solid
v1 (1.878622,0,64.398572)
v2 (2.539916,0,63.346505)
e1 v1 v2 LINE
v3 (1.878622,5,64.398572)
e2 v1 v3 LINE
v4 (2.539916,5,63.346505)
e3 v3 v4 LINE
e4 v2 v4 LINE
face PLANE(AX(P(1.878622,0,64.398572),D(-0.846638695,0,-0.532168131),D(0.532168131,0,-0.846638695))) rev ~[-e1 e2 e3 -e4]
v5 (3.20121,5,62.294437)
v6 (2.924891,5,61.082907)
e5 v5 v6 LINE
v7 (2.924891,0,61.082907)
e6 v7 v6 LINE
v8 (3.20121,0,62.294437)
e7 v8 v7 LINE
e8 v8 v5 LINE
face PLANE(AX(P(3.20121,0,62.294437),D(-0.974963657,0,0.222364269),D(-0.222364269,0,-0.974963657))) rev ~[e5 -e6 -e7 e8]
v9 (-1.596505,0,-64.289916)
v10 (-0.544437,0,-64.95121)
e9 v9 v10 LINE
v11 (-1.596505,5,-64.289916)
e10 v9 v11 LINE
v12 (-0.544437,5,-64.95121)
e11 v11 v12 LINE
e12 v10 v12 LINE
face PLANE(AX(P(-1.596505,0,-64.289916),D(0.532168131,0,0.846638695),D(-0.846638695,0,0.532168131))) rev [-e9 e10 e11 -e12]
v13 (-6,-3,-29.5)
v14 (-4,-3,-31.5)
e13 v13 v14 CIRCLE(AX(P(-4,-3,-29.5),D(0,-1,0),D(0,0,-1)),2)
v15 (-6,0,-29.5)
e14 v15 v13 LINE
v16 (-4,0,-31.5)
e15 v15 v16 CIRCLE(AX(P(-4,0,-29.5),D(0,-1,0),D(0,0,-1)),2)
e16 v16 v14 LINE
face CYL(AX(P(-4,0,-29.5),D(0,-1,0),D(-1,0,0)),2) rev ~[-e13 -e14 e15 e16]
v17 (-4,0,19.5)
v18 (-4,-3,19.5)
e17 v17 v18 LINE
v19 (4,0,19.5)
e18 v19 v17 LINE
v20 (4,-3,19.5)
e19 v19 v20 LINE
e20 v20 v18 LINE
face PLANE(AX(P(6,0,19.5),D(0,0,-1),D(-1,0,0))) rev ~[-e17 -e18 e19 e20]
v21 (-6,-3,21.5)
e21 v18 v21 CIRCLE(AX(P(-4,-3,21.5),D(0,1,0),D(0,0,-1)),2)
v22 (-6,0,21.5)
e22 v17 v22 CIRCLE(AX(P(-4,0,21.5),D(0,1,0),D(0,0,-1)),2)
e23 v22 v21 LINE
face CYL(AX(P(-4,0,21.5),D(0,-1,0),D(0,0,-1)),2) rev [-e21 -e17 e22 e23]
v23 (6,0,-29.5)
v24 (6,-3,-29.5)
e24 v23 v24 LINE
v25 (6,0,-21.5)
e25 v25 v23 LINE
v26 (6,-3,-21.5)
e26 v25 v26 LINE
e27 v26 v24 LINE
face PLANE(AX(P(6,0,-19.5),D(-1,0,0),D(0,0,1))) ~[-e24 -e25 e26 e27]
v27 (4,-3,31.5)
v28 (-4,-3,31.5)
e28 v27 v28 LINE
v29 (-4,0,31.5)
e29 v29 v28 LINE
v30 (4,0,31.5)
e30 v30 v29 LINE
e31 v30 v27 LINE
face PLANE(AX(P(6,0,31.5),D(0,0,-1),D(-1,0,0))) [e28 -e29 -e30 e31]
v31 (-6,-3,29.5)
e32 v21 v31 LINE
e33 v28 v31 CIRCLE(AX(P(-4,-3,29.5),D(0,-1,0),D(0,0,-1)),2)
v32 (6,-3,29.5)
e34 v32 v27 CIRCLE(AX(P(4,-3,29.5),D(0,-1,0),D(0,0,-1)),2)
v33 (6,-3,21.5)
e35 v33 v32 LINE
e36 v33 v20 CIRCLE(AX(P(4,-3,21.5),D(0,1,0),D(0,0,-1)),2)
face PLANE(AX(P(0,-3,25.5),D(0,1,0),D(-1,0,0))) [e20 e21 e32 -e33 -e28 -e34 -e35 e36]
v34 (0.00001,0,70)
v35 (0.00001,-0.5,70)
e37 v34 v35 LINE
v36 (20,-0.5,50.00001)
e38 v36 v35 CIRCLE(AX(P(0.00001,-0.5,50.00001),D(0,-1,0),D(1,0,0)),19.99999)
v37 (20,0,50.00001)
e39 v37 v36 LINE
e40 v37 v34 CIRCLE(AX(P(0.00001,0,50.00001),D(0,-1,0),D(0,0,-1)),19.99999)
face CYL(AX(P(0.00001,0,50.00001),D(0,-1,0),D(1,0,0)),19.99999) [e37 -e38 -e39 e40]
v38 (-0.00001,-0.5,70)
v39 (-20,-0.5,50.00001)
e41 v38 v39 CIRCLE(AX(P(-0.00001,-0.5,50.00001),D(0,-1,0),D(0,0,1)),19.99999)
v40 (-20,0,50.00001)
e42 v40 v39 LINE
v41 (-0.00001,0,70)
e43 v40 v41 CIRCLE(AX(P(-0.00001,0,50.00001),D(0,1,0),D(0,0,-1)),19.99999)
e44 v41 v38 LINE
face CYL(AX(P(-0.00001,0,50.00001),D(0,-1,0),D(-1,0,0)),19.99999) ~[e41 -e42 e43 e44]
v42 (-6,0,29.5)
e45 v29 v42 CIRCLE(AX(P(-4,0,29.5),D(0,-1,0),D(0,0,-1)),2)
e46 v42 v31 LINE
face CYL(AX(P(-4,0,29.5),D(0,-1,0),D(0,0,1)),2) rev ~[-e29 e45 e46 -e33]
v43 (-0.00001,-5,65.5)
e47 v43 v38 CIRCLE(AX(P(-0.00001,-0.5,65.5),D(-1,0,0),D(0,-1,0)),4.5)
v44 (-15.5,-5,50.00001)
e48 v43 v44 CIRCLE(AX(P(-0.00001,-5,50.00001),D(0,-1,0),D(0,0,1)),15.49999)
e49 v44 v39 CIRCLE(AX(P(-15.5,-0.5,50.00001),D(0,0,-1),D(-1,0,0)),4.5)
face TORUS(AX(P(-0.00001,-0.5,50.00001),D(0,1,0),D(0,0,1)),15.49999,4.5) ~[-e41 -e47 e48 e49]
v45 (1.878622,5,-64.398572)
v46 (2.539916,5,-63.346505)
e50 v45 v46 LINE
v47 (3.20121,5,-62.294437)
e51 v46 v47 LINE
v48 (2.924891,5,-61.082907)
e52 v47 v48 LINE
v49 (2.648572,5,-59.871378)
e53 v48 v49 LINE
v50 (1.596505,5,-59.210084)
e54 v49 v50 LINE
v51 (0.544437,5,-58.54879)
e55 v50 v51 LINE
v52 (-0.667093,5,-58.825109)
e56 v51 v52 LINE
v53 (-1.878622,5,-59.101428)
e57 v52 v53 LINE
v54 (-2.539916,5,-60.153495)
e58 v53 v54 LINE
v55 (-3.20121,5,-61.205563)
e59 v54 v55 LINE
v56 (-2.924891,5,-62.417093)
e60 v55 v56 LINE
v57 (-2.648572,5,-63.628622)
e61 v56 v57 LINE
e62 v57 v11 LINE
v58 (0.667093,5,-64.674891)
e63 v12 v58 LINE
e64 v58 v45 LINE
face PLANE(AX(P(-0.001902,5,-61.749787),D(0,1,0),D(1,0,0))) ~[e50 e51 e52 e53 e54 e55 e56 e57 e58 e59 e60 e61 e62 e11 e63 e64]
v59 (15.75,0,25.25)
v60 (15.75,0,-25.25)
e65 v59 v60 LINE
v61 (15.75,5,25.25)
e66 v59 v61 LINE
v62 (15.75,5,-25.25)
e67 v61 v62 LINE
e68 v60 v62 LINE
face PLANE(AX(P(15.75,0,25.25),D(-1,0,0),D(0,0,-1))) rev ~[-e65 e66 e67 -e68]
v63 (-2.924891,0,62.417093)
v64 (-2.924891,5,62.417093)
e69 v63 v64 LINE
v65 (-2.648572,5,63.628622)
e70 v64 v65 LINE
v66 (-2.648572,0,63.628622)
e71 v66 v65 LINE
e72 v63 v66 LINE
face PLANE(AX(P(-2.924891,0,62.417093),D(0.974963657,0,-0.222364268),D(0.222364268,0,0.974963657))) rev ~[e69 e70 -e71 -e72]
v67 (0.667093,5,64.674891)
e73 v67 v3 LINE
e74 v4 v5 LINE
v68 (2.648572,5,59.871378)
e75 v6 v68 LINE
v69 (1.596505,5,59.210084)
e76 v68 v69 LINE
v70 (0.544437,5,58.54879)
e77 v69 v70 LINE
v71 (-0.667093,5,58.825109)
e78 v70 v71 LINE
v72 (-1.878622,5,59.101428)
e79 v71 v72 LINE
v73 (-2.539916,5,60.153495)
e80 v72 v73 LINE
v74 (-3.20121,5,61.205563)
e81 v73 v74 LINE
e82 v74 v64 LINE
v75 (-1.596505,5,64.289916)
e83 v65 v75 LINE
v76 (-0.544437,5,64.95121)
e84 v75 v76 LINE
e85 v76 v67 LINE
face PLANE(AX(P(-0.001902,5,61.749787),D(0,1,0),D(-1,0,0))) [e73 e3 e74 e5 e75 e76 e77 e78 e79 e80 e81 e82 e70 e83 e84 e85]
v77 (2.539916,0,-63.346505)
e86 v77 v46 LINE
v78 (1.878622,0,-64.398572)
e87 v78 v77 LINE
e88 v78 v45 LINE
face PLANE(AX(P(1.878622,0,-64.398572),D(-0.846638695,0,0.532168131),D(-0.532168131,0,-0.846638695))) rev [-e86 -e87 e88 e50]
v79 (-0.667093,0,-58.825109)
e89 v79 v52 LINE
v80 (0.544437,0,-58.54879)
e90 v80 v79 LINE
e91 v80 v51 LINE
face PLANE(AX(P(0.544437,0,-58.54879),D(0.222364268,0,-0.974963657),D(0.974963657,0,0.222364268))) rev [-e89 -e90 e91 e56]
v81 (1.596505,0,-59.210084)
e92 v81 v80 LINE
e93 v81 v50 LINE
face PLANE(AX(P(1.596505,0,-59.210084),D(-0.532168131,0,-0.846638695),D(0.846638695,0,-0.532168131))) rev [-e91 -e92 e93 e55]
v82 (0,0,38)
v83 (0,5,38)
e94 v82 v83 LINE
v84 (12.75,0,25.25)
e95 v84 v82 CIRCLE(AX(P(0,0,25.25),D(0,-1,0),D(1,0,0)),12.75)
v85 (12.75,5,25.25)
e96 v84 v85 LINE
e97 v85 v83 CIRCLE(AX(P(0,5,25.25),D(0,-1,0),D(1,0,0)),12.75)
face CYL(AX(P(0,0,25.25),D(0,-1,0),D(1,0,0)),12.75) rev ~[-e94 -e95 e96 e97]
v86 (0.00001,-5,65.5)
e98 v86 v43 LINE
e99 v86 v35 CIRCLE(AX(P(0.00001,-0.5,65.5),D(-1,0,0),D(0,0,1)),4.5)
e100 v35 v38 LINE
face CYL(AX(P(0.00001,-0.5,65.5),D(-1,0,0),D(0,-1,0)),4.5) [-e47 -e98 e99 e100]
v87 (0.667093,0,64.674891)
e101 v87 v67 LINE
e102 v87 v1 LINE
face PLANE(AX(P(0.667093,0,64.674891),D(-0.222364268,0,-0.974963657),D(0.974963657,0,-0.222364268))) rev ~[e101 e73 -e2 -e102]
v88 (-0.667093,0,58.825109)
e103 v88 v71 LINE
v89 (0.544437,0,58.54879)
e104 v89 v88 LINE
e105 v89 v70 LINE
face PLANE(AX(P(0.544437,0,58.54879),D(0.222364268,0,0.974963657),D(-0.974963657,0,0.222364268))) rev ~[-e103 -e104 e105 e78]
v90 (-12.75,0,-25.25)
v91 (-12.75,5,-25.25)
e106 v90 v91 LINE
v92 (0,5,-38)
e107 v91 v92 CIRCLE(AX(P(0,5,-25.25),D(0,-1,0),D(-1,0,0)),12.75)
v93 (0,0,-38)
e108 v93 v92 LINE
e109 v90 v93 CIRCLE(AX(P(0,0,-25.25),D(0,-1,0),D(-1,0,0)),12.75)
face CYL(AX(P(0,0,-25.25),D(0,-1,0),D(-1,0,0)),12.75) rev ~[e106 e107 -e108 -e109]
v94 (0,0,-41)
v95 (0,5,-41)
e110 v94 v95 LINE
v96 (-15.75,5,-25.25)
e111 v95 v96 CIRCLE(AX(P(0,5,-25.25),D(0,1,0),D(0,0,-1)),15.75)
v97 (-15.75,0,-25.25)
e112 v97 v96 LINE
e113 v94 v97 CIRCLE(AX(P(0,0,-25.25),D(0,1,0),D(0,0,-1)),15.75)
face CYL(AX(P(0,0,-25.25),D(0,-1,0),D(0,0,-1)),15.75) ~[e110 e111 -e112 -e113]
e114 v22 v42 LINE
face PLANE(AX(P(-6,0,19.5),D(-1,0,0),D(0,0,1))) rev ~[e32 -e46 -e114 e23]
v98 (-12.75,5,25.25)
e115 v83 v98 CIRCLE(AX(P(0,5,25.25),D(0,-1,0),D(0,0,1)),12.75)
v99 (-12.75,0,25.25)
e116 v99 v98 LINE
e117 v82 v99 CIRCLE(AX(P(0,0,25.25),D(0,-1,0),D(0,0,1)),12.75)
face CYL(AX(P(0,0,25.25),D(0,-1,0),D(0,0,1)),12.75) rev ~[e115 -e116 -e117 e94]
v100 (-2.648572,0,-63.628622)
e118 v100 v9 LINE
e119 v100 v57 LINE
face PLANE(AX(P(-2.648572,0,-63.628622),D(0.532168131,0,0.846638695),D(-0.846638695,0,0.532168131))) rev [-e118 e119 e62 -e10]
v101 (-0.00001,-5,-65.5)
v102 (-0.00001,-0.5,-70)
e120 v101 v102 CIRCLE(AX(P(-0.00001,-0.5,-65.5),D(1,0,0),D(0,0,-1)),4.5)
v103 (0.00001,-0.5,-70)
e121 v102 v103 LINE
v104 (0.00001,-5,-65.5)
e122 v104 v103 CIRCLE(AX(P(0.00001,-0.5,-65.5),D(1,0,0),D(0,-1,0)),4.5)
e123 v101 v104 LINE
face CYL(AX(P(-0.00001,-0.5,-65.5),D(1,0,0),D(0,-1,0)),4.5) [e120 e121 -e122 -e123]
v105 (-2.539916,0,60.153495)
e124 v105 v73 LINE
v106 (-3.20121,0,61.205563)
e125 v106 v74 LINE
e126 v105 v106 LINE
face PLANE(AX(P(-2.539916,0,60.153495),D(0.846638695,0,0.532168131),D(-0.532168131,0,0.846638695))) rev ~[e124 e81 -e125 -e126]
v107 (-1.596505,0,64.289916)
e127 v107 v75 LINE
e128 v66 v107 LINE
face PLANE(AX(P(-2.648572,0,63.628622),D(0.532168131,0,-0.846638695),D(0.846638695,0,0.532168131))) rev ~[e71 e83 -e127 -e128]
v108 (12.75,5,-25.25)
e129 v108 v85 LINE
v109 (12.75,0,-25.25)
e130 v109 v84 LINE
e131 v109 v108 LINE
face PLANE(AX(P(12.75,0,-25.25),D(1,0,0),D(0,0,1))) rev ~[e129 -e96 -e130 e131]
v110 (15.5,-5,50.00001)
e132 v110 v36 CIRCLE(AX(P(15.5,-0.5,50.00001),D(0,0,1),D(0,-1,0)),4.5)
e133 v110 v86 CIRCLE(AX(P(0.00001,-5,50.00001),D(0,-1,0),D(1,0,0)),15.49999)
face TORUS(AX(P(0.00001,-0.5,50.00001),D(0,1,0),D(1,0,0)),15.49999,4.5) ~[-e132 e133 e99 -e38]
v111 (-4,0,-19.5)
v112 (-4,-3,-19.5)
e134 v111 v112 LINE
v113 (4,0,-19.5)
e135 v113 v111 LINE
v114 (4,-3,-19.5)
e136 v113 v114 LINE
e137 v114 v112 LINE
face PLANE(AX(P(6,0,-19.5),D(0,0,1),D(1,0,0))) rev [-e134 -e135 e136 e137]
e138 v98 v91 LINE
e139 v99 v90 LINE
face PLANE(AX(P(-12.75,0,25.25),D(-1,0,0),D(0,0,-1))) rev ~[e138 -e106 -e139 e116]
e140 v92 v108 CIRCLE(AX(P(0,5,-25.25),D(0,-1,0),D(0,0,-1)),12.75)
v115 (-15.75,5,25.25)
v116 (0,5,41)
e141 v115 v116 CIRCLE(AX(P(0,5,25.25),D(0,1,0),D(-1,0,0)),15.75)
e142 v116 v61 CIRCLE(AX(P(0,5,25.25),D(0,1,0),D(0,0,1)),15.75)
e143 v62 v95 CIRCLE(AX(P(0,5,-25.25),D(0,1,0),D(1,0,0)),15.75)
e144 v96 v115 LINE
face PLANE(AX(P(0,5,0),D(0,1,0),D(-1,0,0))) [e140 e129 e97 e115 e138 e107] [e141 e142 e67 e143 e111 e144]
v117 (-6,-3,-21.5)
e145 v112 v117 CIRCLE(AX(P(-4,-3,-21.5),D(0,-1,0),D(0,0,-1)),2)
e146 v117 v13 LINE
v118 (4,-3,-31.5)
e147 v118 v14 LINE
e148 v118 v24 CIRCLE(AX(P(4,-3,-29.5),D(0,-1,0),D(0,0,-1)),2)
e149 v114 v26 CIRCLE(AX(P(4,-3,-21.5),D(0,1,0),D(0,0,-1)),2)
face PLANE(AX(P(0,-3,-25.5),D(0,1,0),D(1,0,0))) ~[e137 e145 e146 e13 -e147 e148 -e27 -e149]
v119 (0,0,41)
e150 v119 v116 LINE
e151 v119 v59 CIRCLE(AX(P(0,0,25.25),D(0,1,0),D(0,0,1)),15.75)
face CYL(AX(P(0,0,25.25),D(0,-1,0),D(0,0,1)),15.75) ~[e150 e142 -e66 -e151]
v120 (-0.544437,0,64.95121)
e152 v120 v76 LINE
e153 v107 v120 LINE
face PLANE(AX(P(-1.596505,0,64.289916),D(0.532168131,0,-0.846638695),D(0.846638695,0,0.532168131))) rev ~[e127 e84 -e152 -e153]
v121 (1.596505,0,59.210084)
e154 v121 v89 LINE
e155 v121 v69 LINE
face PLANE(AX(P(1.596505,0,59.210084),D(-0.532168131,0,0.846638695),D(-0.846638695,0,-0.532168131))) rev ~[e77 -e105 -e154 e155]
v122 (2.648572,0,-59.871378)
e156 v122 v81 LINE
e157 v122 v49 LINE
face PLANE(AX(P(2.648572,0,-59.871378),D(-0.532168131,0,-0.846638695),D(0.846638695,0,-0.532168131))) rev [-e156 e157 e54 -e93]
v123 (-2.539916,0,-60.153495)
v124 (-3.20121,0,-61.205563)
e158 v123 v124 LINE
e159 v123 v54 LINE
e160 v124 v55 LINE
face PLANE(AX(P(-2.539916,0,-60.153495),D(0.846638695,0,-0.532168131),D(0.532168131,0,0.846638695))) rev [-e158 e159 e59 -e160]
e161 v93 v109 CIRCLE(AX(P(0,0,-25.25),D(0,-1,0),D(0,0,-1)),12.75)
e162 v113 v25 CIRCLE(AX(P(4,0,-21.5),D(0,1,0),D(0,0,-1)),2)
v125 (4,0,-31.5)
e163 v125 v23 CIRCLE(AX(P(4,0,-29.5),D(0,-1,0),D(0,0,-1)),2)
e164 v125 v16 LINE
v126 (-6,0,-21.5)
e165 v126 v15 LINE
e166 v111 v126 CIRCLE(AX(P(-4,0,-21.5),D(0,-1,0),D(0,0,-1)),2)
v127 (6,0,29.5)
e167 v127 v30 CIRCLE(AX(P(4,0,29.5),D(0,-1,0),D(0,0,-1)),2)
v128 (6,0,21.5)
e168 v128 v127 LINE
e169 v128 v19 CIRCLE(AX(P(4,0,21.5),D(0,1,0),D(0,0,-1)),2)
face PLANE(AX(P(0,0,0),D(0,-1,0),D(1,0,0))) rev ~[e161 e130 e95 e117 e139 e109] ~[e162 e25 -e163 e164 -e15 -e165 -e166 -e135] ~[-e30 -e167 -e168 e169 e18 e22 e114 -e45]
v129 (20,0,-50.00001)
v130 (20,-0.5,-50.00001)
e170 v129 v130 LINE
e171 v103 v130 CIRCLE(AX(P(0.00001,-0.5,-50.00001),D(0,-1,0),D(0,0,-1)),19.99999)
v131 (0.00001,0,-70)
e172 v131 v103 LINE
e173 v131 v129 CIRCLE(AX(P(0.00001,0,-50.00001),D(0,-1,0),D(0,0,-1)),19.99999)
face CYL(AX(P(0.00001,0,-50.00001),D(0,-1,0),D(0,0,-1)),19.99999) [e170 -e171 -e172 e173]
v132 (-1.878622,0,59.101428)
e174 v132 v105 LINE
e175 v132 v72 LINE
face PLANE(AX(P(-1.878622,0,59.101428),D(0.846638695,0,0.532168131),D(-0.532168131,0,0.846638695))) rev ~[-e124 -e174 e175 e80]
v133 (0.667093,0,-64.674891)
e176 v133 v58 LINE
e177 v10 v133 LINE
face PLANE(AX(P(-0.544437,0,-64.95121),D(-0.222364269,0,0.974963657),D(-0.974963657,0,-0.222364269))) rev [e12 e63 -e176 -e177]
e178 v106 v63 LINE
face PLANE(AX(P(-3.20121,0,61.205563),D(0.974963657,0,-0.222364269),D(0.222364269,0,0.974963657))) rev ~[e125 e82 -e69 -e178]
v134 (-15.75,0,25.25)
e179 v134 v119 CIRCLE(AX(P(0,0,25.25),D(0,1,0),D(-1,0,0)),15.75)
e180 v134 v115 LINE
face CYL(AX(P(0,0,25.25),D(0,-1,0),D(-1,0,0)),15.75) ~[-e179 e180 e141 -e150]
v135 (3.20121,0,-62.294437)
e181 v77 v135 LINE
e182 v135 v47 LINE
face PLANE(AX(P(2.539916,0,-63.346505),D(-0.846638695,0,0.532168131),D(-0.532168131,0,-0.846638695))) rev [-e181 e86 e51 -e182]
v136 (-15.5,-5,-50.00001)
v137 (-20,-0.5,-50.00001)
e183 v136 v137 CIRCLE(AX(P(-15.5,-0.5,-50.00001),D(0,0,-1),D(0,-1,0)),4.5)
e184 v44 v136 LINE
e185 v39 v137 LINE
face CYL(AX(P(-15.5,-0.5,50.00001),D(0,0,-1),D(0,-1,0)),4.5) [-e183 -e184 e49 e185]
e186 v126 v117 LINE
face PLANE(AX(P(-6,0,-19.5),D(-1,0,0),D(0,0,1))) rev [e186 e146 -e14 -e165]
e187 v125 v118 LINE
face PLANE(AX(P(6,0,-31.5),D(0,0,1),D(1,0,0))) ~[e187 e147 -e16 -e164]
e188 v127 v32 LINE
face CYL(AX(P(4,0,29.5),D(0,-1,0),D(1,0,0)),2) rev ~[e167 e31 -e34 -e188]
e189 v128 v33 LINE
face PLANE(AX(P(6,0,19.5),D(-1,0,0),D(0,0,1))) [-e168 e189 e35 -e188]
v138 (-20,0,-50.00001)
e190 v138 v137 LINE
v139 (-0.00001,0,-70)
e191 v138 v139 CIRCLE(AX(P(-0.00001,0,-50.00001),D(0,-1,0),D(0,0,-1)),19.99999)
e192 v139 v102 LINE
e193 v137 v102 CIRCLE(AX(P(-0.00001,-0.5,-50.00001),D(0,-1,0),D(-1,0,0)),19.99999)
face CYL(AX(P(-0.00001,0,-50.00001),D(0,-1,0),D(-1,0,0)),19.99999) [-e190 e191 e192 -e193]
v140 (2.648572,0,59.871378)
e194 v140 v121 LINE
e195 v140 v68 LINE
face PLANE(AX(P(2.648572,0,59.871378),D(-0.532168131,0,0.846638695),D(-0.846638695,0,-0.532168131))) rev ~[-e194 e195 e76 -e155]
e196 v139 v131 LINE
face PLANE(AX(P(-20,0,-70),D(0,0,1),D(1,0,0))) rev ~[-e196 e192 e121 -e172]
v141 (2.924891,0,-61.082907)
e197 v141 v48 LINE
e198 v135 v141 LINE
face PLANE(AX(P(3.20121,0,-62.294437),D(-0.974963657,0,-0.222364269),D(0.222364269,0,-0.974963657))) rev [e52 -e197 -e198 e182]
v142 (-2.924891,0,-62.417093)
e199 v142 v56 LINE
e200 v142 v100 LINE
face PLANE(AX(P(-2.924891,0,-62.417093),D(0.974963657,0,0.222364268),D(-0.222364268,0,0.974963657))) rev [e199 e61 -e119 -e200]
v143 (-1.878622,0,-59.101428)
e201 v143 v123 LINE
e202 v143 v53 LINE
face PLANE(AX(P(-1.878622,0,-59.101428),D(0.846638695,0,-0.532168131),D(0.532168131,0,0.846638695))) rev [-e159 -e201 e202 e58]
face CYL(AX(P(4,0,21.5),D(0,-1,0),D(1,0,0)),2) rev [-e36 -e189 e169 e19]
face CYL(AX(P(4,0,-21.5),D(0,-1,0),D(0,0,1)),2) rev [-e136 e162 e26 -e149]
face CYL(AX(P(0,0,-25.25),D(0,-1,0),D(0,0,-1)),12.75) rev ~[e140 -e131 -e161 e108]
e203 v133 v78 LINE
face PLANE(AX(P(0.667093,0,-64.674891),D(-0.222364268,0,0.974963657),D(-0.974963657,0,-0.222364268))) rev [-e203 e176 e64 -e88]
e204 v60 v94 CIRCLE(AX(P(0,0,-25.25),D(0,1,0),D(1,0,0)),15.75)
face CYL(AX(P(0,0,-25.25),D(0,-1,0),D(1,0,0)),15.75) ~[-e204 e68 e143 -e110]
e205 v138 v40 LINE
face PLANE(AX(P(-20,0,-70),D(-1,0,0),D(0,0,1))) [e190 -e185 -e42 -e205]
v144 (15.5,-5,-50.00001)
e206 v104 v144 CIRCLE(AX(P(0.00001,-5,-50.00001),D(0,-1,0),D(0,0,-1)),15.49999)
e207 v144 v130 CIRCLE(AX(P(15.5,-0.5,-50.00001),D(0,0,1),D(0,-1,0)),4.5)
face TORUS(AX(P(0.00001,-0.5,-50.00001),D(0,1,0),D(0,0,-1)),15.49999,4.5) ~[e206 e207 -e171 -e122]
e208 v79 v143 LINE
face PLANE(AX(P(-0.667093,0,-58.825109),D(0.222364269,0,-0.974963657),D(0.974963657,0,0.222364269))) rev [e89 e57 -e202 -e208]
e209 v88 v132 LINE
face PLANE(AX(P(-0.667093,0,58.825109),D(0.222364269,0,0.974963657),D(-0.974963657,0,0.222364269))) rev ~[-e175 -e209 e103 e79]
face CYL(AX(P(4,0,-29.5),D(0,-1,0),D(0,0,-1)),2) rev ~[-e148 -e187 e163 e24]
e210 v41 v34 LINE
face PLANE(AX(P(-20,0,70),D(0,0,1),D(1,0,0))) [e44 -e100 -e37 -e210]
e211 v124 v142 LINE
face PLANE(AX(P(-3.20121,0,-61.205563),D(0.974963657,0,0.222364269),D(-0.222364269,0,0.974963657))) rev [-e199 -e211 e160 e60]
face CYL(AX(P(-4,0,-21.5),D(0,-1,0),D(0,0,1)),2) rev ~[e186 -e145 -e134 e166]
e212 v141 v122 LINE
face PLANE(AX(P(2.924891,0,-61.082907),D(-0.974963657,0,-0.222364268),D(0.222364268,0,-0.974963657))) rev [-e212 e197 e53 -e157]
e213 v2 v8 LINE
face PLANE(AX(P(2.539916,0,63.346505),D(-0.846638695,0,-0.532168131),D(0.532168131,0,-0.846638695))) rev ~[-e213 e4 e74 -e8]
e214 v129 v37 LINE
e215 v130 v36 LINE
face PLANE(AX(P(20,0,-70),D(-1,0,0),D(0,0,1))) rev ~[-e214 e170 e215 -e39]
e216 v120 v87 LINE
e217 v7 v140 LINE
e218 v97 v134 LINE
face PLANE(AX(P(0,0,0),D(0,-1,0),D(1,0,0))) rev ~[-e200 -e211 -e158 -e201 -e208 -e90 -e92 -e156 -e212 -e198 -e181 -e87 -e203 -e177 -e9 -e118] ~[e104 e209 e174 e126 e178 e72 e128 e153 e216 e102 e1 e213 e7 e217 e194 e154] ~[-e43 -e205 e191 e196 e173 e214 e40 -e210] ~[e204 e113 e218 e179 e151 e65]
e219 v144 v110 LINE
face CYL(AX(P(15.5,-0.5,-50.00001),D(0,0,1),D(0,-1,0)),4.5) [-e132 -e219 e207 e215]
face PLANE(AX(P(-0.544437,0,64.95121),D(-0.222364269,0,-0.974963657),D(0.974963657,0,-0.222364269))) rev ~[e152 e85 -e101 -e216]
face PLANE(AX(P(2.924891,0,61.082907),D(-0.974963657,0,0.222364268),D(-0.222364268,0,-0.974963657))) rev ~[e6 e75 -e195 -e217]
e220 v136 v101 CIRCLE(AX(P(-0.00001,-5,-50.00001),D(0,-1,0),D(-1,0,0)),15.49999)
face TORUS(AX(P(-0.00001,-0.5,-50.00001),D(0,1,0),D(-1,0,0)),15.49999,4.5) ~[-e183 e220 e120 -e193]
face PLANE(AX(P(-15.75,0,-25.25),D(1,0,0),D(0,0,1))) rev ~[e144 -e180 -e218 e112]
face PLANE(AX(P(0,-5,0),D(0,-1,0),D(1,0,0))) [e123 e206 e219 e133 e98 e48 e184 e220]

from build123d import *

# Parameters (mm, degrees)
F0_W      = 40
F0_H      = 140
F1_DEPTH  = 5
F2_R      = 19.99999
F3_R      = 4.5
F5_DEPTH  = 5
F6_W      = 12
F6_H      = 12
F7_DEPTH  = 3
F8_R      = 2
F10_DEPTH = 5


# Not quite as in the source:
# - a fillet or chamfer is up to 0.001 mm smaller than in the source, because OpenCascade refuses the exact size
# - a pattern or mirror of a feature is missing from the dataset's text; its kind, count and spacing are read off the source's solid


with BuildPart() as f1:
    # F0 (on Front) → F1 (new body)
    with BuildSketch(Plane.XZ):
        Rectangle(F0_W, F0_H)
    extrude(amount=F1_DEPTH)

    # F2 (radius 20 in the source; OpenCascade refuses exactly that, so slightly less here)
    f2_edges = [f1.edges().sort_by_distance(p)[0] for p in [
        (-20, -2.5, 70),
        (20, -2.5, 70),
        (20, -2.5, -70),
        (-20, -2.5, -70),
    ]]
    fillet(f2_edges, radius=F2_R)

    # F3
    f3_edges = [f1.edges().sort_by_distance(p)[0] for p in [
        (20, -5, 0),
        (0, -5, -70),
        (-14.142139, -5, -64.142139),
        (14.142139, -5, -64.142139),
        (-20, -5, 0),
        (-14.142139, -5, 64.142139),
        (14.142139, -5, 64.142139),
        (0, -5, 70),
    ]]
    fillet(f3_edges, radius=F3_R)

    # F4 (on face) → F5 (join)
    with BuildSketch(Plane(origin=(0, 0, 0), x_dir=(-1, 0, 0), z_dir=(0, 1, 0))):
        with BuildLine():
            ThreePointArc((2.5399159699, 60.1534954225), (2.8826851987, 60.9192617469), (3, 61.75))
            ThreePointArc((3, 61.75), (2.9811636084, 62.0856538989), (2.9248909734, 62.4170927923))
            ThreePointArc((2.9248909734, 62.4170927923), (2.4469615912, 63.48562063), (1.5965045374, 64.2899159951))
            ThreePointArc((1.5965045374, 64.2899159951), (0.5029940174, 64.7075322515), (-0.6670927923, 64.6748909734))
            ThreePointArc((-0.6670927923, 64.6748909734), (-1.7356206048, 64.1969616091), (-2.5399159621, 63.3465045899))
            ThreePointArc((-2.5399159621, 63.3465045899), (-2.9575322502, 62.2529940246), (-2.9248909629, 61.0829071616))
            ThreePointArc((-2.9248909629, 61.0829071616), (-2.4469615928, 60.0143793723), (-1.5965045824, 59.2100840332))
            ThreePointArc((-1.5965045824, 59.2100840332), (-0.5029939825, 58.7924677426), (0.6670929131, 58.8251090541))
            ThreePointArc((0.6670929131, 58.8251090541), (1.7356206613, 59.303038431), (2.5399159699, 60.1534954225))
        make_face()
        with BuildLine():
            ThreePointArc((2.9248909734, 62.4170927923), (2.9811636084, 62.0856538989), (3, 61.75))
            ThreePointArc((3, 61.75), (2.8826851987, 60.9192617469), (2.5399159699, 60.1534954225))
            Line((2.5399159699, 60.1534954225), (3.2012098578, 61.2055632972))
            Line((3.2012098578, 61.2055632972), (2.9248909734, 62.4170927923))
        make_face()
        with BuildLine():
            ThreePointArc((1.5965045374, 64.2899159951), (2.4469615912, 63.48562063), (2.9248909734, 62.4170927923))
            Line((2.9248909734, 62.4170927923), (2.648572083, 63.628622314))
            Line((2.648572083, 63.628622314), (1.5965045374, 64.2899159951))
        make_face()
        with BuildLine():
            Line((1.878622314, 59.101427917), (2.5399159699, 60.1534954225))
            ThreePointArc((2.5399159699, 60.1534954225), (1.7356206613, 59.303038431), (0.6670929131, 58.8251090541))
            Line((0.6670929131, 58.8251090541), (1.878622314, 59.101427917))
        make_face()
        with BuildLine():
            ThreePointArc((-0.6670927923, 64.6748909734), (0.5029940174, 64.7075322515), (1.5965045374, 64.2899159951))
            Line((1.5965045374, 64.2899159951), (0.5444367028, 64.9512098578))
            Line((0.5444367028, 64.9512098578), (-0.6670927923, 64.6748909734))
        make_face()
        with BuildLine():
            Line((-0.5444367028, 58.5487901422), (0.6670929131, 58.8251090541))
            ThreePointArc((0.6670929131, 58.8251090541), (-0.5029939825, 58.7924677426), (-1.5965045824, 59.2100840332))
            Line((-1.5965045824, 59.2100840332), (-0.5444367028, 58.5487901422))
        make_face()
        with BuildLine():
            ThreePointArc((-2.5399159621, 63.3465045899), (-1.7356206048, 64.1969616091), (-0.6670927923, 64.6748909734))
            Line((-0.6670927923, 64.6748909734), (-1.878622314, 64.398572083))
            Line((-1.878622314, 64.398572083), (-2.5399159621, 63.3465045899))
        make_face()
        with BuildLine():
            Line((-2.648572083, 59.871377686), (-1.5965045824, 59.2100840332))
            ThreePointArc((-1.5965045824, 59.2100840332), (-2.4469615928, 60.0143793723), (-2.9248909629, 61.0829071616))
            Line((-2.9248909629, 61.0829071616), (-2.648572083, 59.871377686))
        make_face()
        with BuildLine():
            ThreePointArc((-2.9248909629, 61.0829071616), (-2.9575322502, 62.2529940246), (-2.5399159621, 63.3465045899))
            Line((-2.5399159621, 63.3465045899), (-3.2012098578, 62.2944367028))
            Line((-3.2012098578, 62.2944367028), (-2.9248909629, 61.0829071616))
        make_face()
    f5 = extrude(amount=F5_DEPTH)

    # F5_copies: F5 across plane
    add(f5.mirror(Plane(origin=(0, 0, 0), x_dir=(-1, 0, 0), z_dir=(0, 0, -1))))

    # F6 (on face) → F7 (cut)
    with BuildSketch(Plane(origin=(0, 0, 0), x_dir=(-1, 0, 0), z_dir=(0, 1, 0))):
        with Locations((0, 25.5)):
            Rectangle(F6_W, F6_H)
    f7 = extrude(amount=-F7_DEPTH, mode=Mode.SUBTRACT)

    # F7_copies: F7 across plane
    add(f7.mirror(Plane(origin=(0, 0, 0), x_dir=(-1, 0, 0), z_dir=(0, 0, -1))), mode=Mode.SUBTRACT)

    # F8
    f8_edges = [f1.edges().sort_by_distance(p)[0] for p in [
        (6, -1.5, 31.5),
        (-6, -1.5, 31.5),
        (-6, -1.5, 19.5),
        (6, -1.5, 19.5),
        (6, -1.5, -19.5),
        (-6, -1.5, -19.5),
        (-6, -1.5, -31.5),
        (6, -1.5, -31.5),
    ]]
    fillet(f8_edges, radius=F8_R)

    # F9 (on face) → F10 (join)
    with BuildSketch(Plane(origin=(0, 0, 0), x_dir=(-1, 0, 0), z_dir=(0, 1, 0))):
        with BuildLine():
            ThreePointArc((0, -41), (11.1369318037, -36.3869318037), (15.75, -25.25))
            Line((15.75, -25.25), (15.75, 25.25))
            ThreePointArc((15.75, 25.25), (11.1369318037, 36.3869318037), (0, 41))
            ThreePointArc((0, 41), (-11.1369318037, 36.3869318037), (-15.75, 25.25))
            Line((-15.75, 25.25), (-15.75, -25.25))
            ThreePointArc((-15.75, -25.25), (-11.1369318037, -36.3869318037), (0, -41))
        make_face()
        with BuildLine():
            ThreePointArc((12.75, -25.25), (9.0156114601, -34.2656114601), (0, -38))
            ThreePointArc((0, -38), (-9.0156114601, -34.2656114601), (-12.75, -25.25))
            Line((-12.75, -25.25), (-12.75, 25.25))
            ThreePointArc((-12.75, 25.25), (-9.0156114601, 34.2656114601), (0, 38))
            ThreePointArc((0, 38), (9.0156114601, 34.2656114601), (12.75, 25.25))
            Line((12.75, 25.25), (12.75, -25.25))
        make_face(mode=Mode.SUBTRACT)
    extrude(amount=F10_DEPTH)


solid = f1.part
